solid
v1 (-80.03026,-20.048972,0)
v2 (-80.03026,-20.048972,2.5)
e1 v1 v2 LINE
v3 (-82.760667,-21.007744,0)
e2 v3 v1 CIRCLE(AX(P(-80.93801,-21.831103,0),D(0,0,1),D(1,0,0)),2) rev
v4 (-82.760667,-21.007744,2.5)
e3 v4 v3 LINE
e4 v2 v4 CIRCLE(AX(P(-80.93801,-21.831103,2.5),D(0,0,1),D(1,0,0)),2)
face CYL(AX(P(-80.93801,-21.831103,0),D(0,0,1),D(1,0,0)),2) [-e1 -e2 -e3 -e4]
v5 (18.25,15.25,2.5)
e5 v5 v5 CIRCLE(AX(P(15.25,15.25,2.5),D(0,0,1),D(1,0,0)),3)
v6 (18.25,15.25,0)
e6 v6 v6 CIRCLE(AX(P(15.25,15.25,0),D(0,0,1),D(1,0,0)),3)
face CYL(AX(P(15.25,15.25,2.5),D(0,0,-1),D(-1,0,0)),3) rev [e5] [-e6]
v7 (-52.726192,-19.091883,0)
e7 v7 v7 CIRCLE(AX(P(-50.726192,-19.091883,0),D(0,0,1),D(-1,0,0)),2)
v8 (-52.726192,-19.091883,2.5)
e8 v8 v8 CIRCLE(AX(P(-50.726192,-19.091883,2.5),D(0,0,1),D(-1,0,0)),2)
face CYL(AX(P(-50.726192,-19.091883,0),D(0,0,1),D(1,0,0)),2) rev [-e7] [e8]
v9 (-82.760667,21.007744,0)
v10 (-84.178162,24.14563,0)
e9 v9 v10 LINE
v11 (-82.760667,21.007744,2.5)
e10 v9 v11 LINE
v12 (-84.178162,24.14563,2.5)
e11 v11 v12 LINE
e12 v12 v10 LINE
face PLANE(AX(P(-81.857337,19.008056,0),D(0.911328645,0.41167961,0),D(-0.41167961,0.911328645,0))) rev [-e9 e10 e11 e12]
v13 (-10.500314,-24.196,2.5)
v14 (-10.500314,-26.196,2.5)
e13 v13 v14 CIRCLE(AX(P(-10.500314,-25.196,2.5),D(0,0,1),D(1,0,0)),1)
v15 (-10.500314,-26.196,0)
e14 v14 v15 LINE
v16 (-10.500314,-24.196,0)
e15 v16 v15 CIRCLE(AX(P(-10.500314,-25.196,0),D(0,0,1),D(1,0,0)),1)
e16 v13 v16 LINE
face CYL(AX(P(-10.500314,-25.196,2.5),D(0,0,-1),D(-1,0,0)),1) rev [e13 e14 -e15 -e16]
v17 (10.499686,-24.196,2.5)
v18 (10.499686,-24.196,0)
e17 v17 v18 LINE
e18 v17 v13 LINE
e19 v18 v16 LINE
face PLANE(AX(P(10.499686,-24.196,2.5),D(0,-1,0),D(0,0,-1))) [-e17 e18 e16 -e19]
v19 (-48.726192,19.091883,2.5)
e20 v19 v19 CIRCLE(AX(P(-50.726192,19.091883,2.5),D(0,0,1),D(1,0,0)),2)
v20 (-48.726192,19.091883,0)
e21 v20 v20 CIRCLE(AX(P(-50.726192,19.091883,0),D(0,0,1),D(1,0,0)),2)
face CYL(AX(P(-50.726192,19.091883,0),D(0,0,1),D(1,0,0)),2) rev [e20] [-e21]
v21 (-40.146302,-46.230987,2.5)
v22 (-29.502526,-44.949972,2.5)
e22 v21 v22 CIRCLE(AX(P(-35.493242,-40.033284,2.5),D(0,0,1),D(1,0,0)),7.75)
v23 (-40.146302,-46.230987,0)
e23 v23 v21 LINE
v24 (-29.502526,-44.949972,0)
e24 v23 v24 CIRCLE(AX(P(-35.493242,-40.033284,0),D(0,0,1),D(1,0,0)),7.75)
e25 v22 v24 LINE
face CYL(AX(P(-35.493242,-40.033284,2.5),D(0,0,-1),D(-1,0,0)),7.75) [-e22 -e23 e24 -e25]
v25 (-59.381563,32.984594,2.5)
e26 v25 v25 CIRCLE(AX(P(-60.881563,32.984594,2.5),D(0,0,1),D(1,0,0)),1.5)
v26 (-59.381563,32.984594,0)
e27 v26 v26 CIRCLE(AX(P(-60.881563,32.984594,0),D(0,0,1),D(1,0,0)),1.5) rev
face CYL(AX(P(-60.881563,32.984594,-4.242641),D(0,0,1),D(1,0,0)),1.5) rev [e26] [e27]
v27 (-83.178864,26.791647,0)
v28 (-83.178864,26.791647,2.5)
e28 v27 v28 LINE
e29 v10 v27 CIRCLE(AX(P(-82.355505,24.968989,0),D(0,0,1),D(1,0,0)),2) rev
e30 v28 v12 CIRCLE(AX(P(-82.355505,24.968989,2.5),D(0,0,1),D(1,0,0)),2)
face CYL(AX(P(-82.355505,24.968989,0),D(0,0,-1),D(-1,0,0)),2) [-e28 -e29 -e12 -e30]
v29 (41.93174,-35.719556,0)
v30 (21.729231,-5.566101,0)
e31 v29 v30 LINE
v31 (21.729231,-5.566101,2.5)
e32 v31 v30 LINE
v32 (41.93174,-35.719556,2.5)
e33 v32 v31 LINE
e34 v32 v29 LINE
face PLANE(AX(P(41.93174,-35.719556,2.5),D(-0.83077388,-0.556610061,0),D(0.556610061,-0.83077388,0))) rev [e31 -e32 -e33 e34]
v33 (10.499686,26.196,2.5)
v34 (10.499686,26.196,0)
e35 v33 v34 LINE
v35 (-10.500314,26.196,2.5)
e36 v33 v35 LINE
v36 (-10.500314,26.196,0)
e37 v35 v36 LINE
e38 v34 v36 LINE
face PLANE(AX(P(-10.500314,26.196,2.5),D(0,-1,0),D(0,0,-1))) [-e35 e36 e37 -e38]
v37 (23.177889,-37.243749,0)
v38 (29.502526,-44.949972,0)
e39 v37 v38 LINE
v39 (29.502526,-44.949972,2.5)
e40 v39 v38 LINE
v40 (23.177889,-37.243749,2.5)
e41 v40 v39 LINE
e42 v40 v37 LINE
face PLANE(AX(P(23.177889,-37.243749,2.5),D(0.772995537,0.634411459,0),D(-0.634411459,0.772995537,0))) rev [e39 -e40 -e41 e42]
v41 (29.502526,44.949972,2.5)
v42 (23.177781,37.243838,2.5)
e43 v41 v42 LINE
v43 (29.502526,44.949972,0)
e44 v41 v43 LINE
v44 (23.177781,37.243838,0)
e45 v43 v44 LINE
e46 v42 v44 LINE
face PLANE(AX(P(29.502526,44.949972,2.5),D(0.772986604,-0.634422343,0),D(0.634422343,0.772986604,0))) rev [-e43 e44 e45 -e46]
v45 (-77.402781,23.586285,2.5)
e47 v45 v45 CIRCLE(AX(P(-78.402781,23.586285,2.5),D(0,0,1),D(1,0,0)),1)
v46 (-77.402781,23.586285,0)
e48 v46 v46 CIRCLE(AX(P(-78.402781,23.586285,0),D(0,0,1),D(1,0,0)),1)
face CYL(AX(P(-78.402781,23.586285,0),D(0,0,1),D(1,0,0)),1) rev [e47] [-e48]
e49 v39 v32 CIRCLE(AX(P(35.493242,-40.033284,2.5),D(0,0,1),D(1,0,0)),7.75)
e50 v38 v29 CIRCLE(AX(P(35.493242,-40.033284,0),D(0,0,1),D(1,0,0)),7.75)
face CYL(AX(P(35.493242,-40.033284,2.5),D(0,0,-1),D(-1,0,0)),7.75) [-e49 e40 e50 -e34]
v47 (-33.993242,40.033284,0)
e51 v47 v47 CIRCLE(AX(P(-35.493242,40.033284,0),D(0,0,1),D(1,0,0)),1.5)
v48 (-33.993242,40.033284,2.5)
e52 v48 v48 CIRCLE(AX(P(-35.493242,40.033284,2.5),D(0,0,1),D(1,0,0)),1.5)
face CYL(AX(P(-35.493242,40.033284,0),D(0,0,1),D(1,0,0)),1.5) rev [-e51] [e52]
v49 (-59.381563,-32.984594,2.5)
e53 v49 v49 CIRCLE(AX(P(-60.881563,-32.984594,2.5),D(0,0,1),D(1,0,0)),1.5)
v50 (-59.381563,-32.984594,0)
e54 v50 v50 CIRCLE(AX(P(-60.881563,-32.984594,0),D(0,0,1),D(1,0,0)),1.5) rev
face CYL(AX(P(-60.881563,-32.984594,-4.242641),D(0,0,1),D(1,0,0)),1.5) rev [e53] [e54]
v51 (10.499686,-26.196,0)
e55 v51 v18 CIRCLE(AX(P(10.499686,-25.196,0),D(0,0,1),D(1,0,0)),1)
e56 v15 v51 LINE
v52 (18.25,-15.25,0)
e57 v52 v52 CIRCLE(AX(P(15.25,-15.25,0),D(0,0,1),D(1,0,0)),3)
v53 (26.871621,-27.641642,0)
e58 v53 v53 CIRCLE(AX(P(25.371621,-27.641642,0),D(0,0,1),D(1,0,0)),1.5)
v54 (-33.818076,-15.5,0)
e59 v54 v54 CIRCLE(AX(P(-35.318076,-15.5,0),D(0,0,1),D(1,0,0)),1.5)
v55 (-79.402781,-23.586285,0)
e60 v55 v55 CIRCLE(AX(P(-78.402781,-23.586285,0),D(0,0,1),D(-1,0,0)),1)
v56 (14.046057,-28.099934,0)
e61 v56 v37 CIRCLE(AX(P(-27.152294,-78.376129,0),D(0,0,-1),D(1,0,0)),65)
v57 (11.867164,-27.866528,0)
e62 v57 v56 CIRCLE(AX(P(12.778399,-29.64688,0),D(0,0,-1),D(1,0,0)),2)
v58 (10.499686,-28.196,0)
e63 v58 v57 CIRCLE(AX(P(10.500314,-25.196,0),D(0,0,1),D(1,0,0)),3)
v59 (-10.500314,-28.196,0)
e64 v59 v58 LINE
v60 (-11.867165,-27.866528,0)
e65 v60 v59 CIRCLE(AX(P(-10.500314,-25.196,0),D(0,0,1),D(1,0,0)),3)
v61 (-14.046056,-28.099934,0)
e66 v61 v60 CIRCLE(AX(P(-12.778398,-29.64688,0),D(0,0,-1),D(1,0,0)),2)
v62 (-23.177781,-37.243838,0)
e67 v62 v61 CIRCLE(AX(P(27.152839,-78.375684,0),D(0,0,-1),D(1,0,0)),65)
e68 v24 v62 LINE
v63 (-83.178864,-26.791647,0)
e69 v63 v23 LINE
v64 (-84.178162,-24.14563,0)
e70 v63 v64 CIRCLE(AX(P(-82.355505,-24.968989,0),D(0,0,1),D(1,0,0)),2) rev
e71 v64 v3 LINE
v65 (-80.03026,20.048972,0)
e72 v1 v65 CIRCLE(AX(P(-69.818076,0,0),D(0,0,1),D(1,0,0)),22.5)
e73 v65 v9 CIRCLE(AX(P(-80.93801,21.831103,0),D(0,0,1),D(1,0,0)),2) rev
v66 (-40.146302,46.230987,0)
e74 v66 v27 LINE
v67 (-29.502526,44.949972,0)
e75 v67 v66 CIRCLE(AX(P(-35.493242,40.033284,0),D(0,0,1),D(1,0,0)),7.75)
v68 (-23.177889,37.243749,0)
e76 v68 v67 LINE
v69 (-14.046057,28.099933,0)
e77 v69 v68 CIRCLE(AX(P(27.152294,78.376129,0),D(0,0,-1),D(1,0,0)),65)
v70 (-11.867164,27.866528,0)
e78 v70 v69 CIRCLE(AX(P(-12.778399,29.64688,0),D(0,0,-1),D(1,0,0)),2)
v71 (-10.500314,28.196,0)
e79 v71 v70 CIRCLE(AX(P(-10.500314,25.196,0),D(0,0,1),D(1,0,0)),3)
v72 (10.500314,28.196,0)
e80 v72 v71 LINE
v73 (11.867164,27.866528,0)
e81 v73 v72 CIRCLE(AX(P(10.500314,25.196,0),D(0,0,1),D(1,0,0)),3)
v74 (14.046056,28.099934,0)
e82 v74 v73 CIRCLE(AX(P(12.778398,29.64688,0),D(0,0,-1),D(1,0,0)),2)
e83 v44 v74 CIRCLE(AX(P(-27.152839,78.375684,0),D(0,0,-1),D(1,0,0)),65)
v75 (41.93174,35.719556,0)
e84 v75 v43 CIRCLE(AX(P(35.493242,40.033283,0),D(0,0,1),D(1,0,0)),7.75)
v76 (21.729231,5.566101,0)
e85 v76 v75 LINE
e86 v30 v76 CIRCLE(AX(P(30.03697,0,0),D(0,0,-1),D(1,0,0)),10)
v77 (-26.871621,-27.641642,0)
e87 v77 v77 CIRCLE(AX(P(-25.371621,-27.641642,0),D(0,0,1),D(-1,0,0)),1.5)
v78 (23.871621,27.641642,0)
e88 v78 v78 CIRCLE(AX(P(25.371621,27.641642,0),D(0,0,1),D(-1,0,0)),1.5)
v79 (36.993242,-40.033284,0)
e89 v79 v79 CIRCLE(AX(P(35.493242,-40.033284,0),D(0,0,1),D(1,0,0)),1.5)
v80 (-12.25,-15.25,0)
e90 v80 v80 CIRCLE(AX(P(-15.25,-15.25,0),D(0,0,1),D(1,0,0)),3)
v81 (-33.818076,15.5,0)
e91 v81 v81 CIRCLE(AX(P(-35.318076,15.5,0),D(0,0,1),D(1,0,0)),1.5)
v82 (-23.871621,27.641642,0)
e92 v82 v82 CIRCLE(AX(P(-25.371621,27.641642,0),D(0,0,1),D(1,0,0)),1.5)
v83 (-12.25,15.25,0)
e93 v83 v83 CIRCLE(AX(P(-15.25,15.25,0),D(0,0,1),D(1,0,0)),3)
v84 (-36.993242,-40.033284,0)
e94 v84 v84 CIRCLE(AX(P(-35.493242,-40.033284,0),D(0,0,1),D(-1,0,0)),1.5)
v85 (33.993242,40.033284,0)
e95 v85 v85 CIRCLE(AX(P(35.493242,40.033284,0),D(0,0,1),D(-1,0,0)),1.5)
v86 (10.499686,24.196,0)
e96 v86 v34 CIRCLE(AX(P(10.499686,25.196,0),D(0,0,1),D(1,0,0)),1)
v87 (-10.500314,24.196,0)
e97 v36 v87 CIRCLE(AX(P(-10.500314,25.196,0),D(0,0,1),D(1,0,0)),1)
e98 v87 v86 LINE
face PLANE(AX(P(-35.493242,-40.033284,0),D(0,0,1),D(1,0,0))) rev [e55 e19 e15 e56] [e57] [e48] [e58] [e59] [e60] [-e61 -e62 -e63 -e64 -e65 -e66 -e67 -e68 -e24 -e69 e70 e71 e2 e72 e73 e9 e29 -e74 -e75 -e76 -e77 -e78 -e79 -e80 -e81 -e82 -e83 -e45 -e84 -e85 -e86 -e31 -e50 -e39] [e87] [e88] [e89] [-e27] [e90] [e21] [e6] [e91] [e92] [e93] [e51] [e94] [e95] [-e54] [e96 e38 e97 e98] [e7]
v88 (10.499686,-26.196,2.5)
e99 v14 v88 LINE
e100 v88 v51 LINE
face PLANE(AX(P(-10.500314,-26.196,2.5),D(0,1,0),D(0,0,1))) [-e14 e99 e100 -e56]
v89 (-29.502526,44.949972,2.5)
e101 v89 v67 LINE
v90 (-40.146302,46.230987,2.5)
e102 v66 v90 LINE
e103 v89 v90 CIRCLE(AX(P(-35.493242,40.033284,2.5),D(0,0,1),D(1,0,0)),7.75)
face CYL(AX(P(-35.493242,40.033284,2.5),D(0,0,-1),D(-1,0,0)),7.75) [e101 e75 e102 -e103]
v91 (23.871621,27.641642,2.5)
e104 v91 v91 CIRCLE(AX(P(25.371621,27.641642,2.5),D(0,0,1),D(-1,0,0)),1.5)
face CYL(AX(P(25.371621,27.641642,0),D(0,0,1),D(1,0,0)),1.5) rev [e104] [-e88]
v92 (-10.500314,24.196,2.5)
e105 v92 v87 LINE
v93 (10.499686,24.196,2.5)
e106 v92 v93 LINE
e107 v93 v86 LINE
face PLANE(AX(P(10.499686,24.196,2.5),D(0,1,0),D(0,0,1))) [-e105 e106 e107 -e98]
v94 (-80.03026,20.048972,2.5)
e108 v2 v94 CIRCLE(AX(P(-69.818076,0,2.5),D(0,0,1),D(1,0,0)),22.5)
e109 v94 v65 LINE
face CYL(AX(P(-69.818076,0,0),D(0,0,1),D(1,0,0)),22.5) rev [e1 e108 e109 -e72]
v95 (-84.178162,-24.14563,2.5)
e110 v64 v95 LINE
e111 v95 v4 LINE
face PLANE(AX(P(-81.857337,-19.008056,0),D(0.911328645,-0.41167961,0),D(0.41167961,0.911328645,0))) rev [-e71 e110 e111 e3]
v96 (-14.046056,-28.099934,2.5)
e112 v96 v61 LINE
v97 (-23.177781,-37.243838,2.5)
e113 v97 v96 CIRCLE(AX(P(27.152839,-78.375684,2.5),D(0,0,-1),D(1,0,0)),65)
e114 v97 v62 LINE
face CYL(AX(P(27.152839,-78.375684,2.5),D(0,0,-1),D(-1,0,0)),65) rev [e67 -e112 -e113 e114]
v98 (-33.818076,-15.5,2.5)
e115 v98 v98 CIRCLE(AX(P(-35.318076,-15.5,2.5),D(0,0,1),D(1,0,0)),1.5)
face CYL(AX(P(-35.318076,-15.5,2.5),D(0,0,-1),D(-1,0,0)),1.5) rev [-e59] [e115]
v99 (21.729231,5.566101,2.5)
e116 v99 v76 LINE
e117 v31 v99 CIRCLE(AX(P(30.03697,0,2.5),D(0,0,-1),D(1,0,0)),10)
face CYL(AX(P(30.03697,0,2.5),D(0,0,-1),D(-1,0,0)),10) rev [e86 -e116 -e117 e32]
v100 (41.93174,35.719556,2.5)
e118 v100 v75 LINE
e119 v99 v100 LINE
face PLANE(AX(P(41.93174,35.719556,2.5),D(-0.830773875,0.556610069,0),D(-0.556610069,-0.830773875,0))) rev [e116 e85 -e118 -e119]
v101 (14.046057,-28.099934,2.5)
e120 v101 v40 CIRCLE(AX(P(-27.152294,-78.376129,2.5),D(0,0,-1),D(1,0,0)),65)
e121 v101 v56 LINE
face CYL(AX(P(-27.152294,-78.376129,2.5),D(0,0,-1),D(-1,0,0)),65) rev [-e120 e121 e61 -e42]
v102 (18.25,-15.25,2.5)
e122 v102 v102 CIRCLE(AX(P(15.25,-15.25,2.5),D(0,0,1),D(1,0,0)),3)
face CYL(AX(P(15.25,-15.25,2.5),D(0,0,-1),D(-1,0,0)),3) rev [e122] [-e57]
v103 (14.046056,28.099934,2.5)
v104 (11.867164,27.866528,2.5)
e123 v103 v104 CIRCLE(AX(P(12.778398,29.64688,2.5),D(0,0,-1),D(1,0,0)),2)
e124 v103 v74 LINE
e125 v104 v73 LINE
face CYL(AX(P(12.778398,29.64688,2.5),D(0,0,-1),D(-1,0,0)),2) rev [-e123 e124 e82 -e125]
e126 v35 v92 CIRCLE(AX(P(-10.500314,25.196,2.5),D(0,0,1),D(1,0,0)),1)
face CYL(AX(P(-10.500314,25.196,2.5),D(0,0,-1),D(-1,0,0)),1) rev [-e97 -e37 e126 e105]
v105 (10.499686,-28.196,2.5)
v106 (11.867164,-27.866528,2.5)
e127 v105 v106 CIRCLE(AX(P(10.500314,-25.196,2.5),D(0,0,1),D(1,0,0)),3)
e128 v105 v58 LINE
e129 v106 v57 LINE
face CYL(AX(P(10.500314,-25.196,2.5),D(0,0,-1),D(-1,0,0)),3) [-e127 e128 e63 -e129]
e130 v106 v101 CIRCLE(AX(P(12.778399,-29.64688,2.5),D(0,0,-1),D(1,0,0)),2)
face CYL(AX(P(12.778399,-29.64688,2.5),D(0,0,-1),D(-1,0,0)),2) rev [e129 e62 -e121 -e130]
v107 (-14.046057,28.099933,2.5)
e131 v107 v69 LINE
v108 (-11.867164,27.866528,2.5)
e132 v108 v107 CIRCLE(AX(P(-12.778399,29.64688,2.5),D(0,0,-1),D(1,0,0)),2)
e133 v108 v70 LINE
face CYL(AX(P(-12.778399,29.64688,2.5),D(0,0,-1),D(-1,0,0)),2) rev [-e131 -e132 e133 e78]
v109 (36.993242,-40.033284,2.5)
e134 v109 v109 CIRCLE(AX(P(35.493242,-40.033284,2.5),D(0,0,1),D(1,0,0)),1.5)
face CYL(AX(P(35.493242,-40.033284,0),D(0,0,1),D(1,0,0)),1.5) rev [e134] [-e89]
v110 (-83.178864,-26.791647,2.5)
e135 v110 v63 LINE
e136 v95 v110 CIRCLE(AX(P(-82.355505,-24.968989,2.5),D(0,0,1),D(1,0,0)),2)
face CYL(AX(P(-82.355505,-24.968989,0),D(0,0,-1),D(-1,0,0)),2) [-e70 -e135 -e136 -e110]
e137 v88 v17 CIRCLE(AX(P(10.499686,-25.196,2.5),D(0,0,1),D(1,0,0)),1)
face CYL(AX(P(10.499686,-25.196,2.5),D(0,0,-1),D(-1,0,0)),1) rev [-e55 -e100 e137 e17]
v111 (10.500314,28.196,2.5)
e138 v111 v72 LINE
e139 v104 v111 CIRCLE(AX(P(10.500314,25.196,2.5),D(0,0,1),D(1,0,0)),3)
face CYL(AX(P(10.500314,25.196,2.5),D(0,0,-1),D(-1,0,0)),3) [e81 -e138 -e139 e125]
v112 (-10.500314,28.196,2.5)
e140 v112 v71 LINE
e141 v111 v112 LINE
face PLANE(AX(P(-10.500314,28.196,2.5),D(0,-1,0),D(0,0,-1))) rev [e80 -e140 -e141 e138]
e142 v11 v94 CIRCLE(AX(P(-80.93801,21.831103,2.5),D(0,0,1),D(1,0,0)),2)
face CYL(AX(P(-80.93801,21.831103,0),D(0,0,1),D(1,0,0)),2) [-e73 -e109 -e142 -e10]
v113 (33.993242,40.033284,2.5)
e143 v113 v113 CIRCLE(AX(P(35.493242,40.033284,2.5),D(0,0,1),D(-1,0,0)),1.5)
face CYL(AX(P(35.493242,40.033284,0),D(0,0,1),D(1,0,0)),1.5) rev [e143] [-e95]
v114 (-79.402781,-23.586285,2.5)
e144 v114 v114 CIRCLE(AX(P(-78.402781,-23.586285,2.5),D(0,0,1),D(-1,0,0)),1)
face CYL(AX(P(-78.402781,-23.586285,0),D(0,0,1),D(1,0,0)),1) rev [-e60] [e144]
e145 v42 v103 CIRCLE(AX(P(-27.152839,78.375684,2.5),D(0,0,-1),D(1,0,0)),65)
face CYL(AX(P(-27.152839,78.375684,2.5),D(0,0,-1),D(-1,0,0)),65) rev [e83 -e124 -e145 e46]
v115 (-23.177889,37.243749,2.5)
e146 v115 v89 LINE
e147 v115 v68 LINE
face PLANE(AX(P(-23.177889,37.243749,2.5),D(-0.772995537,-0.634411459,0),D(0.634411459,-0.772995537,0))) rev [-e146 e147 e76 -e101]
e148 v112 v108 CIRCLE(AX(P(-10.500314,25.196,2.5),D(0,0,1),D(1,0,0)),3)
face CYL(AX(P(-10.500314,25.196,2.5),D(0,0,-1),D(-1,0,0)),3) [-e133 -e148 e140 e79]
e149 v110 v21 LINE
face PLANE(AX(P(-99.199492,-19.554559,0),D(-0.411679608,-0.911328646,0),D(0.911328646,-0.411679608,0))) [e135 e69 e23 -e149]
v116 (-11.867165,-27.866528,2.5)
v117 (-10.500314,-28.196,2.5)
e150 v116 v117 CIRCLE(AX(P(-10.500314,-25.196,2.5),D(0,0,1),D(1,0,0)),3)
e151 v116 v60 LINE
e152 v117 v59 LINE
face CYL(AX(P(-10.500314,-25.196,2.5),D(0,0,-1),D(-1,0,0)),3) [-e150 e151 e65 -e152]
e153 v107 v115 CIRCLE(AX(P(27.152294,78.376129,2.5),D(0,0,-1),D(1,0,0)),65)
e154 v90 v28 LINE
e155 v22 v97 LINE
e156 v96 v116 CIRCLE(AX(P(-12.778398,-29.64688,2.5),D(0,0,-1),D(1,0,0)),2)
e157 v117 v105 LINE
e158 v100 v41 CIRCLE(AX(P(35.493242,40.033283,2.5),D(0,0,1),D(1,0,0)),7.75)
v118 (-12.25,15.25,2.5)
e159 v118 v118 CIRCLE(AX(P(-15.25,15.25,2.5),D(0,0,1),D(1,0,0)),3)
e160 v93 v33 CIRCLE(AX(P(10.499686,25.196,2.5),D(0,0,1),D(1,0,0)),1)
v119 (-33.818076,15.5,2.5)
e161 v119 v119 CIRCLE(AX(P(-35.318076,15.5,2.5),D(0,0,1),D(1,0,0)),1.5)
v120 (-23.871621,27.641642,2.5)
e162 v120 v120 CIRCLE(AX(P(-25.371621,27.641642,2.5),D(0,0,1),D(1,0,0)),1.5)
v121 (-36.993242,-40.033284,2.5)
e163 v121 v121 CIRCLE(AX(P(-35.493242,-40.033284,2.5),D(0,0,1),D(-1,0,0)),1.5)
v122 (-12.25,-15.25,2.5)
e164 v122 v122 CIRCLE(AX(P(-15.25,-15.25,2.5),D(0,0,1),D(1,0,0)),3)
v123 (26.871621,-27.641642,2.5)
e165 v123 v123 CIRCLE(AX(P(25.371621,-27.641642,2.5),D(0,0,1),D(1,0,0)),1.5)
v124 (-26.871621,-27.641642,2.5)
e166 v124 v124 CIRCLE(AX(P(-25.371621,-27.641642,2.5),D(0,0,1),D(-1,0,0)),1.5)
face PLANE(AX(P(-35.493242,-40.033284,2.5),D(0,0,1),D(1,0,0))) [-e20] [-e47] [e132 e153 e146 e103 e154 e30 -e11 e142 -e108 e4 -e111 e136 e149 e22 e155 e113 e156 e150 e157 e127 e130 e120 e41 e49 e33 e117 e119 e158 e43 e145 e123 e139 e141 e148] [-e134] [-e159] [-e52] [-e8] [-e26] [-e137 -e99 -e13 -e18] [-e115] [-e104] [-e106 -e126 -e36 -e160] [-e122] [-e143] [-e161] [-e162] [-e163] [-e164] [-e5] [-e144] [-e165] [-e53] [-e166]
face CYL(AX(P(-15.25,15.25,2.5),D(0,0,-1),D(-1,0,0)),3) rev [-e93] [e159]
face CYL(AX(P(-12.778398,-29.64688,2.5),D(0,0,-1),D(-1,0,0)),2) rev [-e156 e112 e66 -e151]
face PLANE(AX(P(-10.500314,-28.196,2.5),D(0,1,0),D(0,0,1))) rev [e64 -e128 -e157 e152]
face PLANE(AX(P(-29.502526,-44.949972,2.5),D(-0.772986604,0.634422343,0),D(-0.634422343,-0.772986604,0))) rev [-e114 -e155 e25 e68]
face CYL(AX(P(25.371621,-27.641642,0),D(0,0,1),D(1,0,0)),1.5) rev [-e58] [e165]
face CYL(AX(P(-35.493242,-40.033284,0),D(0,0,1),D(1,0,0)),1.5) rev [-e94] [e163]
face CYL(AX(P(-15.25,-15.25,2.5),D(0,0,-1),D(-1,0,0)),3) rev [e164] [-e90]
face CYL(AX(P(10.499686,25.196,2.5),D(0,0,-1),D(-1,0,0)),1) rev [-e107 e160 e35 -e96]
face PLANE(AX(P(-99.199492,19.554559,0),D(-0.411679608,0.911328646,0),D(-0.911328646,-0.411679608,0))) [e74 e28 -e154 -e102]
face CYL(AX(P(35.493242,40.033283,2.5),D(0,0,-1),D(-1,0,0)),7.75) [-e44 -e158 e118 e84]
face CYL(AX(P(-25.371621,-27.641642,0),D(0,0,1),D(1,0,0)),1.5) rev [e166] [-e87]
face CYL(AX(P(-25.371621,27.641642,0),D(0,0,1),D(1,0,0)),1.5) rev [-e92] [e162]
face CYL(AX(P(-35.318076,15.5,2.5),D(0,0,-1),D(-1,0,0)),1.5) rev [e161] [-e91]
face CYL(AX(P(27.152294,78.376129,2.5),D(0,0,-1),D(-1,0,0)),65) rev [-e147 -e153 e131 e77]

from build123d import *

# Parameters (mm, degrees)
CROQUIS1_R              = 2.25
CROQUIS1_R_2            = 3
CROQUIS1_R_3            = 1.5
CROQUIS1_R_4            = 2.249997567
SALIENTE_EXTRUIR1_DEPTH = 2.5
SALIENTE_EXTRUIR3_START = -2.5
CROQUIS6_R              = 2.250000066
CROQUIS6_R_2            = 1.5
CROQUIS6_R_3            = 2.25
SALIENTE_EXTRUIR3_DEPTH = 2.5
CROQUIS5_R              = 22.5
CROQUIS5_R_2            = 1
CROQUIS5_R_3            = 2
CORTAR_EXTRUIR5_DEPTH   = 2.5
CORTAR_EXTRUIR6_DEPTH   = 2.5
REDONDEO1_R             = 2
CROQUIS11_R             = 1.5
CROQUIS11_R_2           = 1.500000006
CORTAR_EXTRUIR7_DEPTH   = 2.5


with BuildPart() as part:
    # Croquis1 → Saliente-Extruir1 (new body)
    with BuildSketch(Plane.XY):
        with BuildLine():
            Line((-29.502526327, -44.949972179), (-23.17778065, -37.243838032))
            ThreePointArc((-23.17778065, -37.243838032), (-18.839723212, -32.444384768), (-14.046056443, -28.099933953))
            ThreePointArc((-14.046056443, -28.099933953), (-12.991422185, -27.658257217), (-11.867164621, -27.866527921))
            ThreePointArc((-11.867164621, -27.866527921), (-11.203313373, -28.112469078), (-10.500314, -28.196))
            Line((-10.500314, -28.196), (10.499686, -28.196))
            ThreePointArc((10.499686, -28.196), (11.203007921, -28.112542722), (11.867164264, -27.866528101))
            ThreePointArc((11.867164264, -27.866528101), (12.991422421, -27.658256674), (14.046057406, -28.099933523))
            ThreePointArc((14.046057406, -28.099933523), (18.839775902, -32.444337151), (23.177889012, -37.243749049))
            Line((23.177889012, -37.243749049), (29.502526012, -44.949972049))
            ThreePointArc((29.502526012, -44.949972049), (40.113877497, -46.255199126), (41.931739547, -35.719556022))
            Line((41.931739547, -35.719556022), (21.72923101, -5.566101046))
            ThreePointArc((21.72923101, -5.566101046), (20.036969431, -9.5e-08), (21.729230693, 5.566100954))
            Line((21.729230693, 5.566100954), (41.931739693, 35.719555954))
            ThreePointArc((41.931739693, 35.719555954), (40.113877277, 46.255198335), (29.502526336, 44.949972165))
            Line((29.502526336, 44.949972165), (23.17778065, 37.243838007))
            ThreePointArc((23.17778065, 37.243838007), (18.839723212, 32.444384742), (14.046056443, 28.099933927))
            ThreePointArc((14.046056443, 28.099933927), (12.991421988, 27.658257139), (11.867164252, 27.866528027))
            ThreePointArc((11.867164252, 27.866528027), (11.203313175, 28.112469073), (10.500314, 28.195999974))
            Line((10.500314, 28.195999974), (-10.500314, 28.195999974))
            ThreePointArc((-10.500314, 28.195999974), (-11.203313178, 28.112469098), (-11.867164264, 27.866528075))
            ThreePointArc((-11.867164264, 27.866528075), (-12.991422421, 27.658256648), (-14.046057406, 28.099933497))
            ThreePointArc((-14.046057406, 28.099933497), (-18.839775902, 32.444337126), (-23.177889012, 37.243749023))
            Line((-23.177889012, 37.243749023), (-29.502526012, 44.949972023))
            ThreePointArc((-29.502526012, 44.949972023), (-40.146302424, 46.230987494), (-41.886340556, 35.652554517))
            ThreePointArc((-41.886340556, 35.652554517), (-41.288874902, 25.337679941), (-50.13550001, 20.000000021))
            Line((-50.13550001, 20.000000021), (-97.31807601, 20.000000021))
            ThreePointArc((-97.31807601, 20.000000021), (-99.1994919, 19.554558541), (-100.681450855, 18.312809163))
            add(Edge.make_bspline(
                [(-107.31807554, 2.1e-08), (-107.252414123, 7.059743944), (-104.975710329, 13.164639039), (-100.681450855, 18.312809163)],
                knots=[0, 0, 0, 0, 1, 1, 1, 1], degree=3))
            add(Edge.make_bspline(
                [(-107.31807554, 2.1e-08), (-107.252414123, -7.059743902), (-104.975710329, -13.164638997), (-100.681450855, -18.312809121)],
                knots=[0, 0, 0, 0, 1, 1, 1, 1], degree=3))
            ThreePointArc((-100.681450855, -18.312809121), (-99.19949186, -19.554558345), (-97.31807601, -19.9999997))
            Line((-97.31807601, -19.9999997), (-50.13550001, -19.9999997))
            ThreePointArc((-50.13550001, -19.9999997), (-41.288874902, -25.33767962), (-41.886340556, -35.652554196))
            ThreePointArc((-41.886340556, -35.652554196), (-40.146302646, -46.230987042), (-29.502526327, -44.949972179))
        make_face()
        with Locations((-25.371621, 27.641642)):
            Circle(CROQUIS1_R, mode=Mode.SUBTRACT)
        with Locations((-35.493242035, 40.033284004)):
            Circle(CROQUIS1_R, mode=Mode.SUBTRACT)
        with Locations((-35.49324201, -40.0332837)):
            Circle(CROQUIS1_R, mode=Mode.SUBTRACT)
        with Locations((15.25, -15.25)):
            Circle(CROQUIS1_R_2, mode=Mode.SUBTRACT)
        with Locations((35.493242035, -40.03328403)):
            Circle(CROQUIS1_R, mode=Mode.SUBTRACT)
        with Locations((-15.25, 15.25)):
            Circle(CROQUIS1_R_2, mode=Mode.SUBTRACT)
        with Locations((-25.371621, -27.641642)):
            Circle(CROQUIS1_R, mode=Mode.SUBTRACT)
        with Locations((-35.318076, 15.5)):
            Circle(CROQUIS1_R_3, mode=Mode.SUBTRACT)
        with Locations((25.371621, -27.641642)):
            Circle(CROQUIS1_R, mode=Mode.SUBTRACT)
        with Locations((-15.25, -15.25)):
            Circle(CROQUIS1_R_2, mode=Mode.SUBTRACT)
        with Locations((-97.318076, 15.5)):
            Circle(CROQUIS1_R_3, mode=Mode.SUBTRACT)
        with Locations((15.25, 15.25)):
            Circle(CROQUIS1_R_2, mode=Mode.SUBTRACT)
        with Locations((-35.318076, -15.5)):
            Circle(CROQUIS1_R_3, mode=Mode.SUBTRACT)
        with Locations((25.371621, 27.641642)):
            Circle(CROQUIS1_R, mode=Mode.SUBTRACT)
        with Locations((-97.318076, -15.5)):
            Circle(CROQUIS1_R_3, mode=Mode.SUBTRACT)
        with Locations((35.493241695, 40.03328329)):
            Circle(CROQUIS1_R_4, mode=Mode.SUBTRACT)
        with BuildLine():
            Line((10.499686, -24.196), (-10.500314, -24.196))
            ThreePointArc((-10.500314, -24.196), (-11.500314, -25.196), (-10.500314, -26.196))
            Line((-10.500314, -26.196), (10.499686, -26.196))
            ThreePointArc((10.499686, -26.196), (11.499686, -25.196), (10.499686, -24.196))
        make_face(mode=Mode.SUBTRACT)
        with BuildLine():
            Line((10.499686, 24.196), (-10.500314, 24.196))
            ThreePointArc((-10.500314, 24.196), (-11.500314, 25.196), (-10.500314, 26.196))
            Line((-10.500314, 26.196), (10.499686, 26.196))
            ThreePointArc((10.499686, 26.196), (11.499686, 25.196), (10.499686, 24.196))
        make_face(mode=Mode.SUBTRACT)
    extrude(amount=SALIENTE_EXTRUIR1_DEPTH)


with BuildPart() as saliente_extruir3_tool:
    # Croquis6 → Saliente-Extruir3 (new body)
    # profile 1 of 10: a face of its own
    with BuildSketch(Plane.XY.offset(2.5).offset(SALIENTE_EXTRUIR3_START)):
        with Locations((-35.493242163, 40.033284025)):
            Circle(CROQUIS6_R)
        with Locations((-35.493242163, 40.033284025)):
            Circle(CROQUIS6_R_2, mode=Mode.SUBTRACT)
    # profile 2 of 10: a face of its own
    with BuildSketch(Plane.XY.offset(2.5).offset(SALIENTE_EXTRUIR3_START)):
        with Locations((-25.371621, 27.641642)):
            Circle(CROQUIS6_R_3)
        with Locations((-25.371621, 27.641642)):
            Circle(CROQUIS6_R_2, mode=Mode.SUBTRACT)
    # profile 3 of 10: a face of its own
    with BuildSketch(Plane.XY.offset(2.5).offset(SALIENTE_EXTRUIR3_START)):
        with Locations((25.371621, 27.641642)):
            Circle(CROQUIS6_R_3)
        with Locations(Location((25.371621, 27.641642, 0), (0, 0, 180))):
            Circle(CROQUIS6_R_2, mode=Mode.SUBTRACT)
    # profile 4 of 10: a face of its own
    with BuildSketch(Plane.XY.offset(2.5).offset(SALIENTE_EXTRUIR3_START)):
        with Locations((35.493242163, 40.033284025)):
            Circle(CROQUIS6_R)
        with Locations(Location((35.493242163, 40.033284025, 0), (0, 0, 180))):
            Circle(CROQUIS6_R_2, mode=Mode.SUBTRACT)
    # profile 5 of 10: a face of its own
    with BuildSketch(Plane.XY.offset(2.5).offset(SALIENTE_EXTRUIR3_START)):
        with Locations((35.493242163, -40.033284025)):
            Circle(CROQUIS6_R)
        with Locations((35.493242163, -40.033284025)):
            Circle(CROQUIS6_R_2, mode=Mode.SUBTRACT)
    # profile 6 of 10: a face of its own
    with BuildSketch(Plane.XY.offset(2.5).offset(SALIENTE_EXTRUIR3_START)):
        with Locations((25.371621, -27.641642)):
            Circle(CROQUIS6_R_3)
        with Locations((25.371621, -27.641642)):
            Circle(CROQUIS6_R_2, mode=Mode.SUBTRACT)
    # profile 7 of 10: a face of its own
    with BuildSketch(Plane.XY.offset(2.5).offset(SALIENTE_EXTRUIR3_START)):
        with Locations((-25.371621, -27.641642)):
            Circle(CROQUIS6_R_3)
        with Locations(Location((-25.371621, -27.641642, 0), (0, 0, 180))):
            Circle(CROQUIS6_R_2, mode=Mode.SUBTRACT)
    # profile 8 of 10: a face of its own
    with BuildSketch(Plane.XY.offset(2.5).offset(SALIENTE_EXTRUIR3_START)):
        with Locations((-35.493242163, -40.033284025)):
            Circle(CROQUIS6_R)
        with Locations(Location((-35.493242163, -40.033284025, 0), (0, 0, 180))):
            Circle(CROQUIS6_R_2, mode=Mode.SUBTRACT)
    # profile 9 of 10: a face of its own
    with BuildSketch(Plane.XY.offset(2.5).offset(SALIENTE_EXTRUIR3_START)):
        with BuildLine():
            Line((-99.1994919, 19.554558541), (-40.146302424, 46.230987494))
            ThreePointArc((-40.146302424, 46.230987494), (-43.140478024, 41.291171845), (-41.886340556, 35.652554517))
            ThreePointArc((-41.886340556, 35.652554517), (-41.288875033, 25.33768001), (-50.13550001, 20.000000021))
            Line((-50.13550001, 20.000000021), (-97.31807601, 20.000000021))
            ThreePointArc((-97.31807601, 20.000000021), (-98.214581153, 19.590579436), (-99.1994919, 19.554558541))
        make_face()
    # profile 10 of 10: a face of its own
    with BuildSketch(Plane.XY.offset(2.5).offset(SALIENTE_EXTRUIR3_START)):
        with BuildLine():
            Line((-50.13550001, -20.000000021), (-97.31807601, -20.000000021))
            ThreePointArc((-97.31807601, -20.000000021), (-98.214581153, -19.590579436), (-99.1994919, -19.554558541))
            Line((-99.1994919, -19.554558541), (-40.146302424, -46.230987494))
            ThreePointArc((-40.146302424, -46.230987494), (-43.140478024, -41.291171845), (-41.886340556, -35.652554517))
            ThreePointArc((-41.886340556, -35.652554517), (-41.288875033, -25.33768001), (-50.13550001, -20.000000021))
        make_face()
    extrude(amount=SALIENTE_EXTRUIR3_DEPTH)


with BuildPart() as part_1:
    add(part.part)


with BuildPart() as part_2:
    # Saliente-Extruir3: joined with saliente_extruir3_tool
    add(part_1.part.fuse(saliente_extruir3_tool.part, tol=0.00001))

    # Croquis5 → Cortar-Extruir5 (cut)
    with BuildSketch(Plane.XY.offset(2.5)):
        with Locations((-69.81807554, 2.1e-08)):
            Circle(CROQUIS5_R)
        with Locations((-78.402781137, 23.586284803)):
            Circle(CROQUIS5_R_2)
        with Locations((-94.91807554, 2.1e-08)):
            Circle(CROQUIS5_R_2)
        with Locations(Location((-78.402781137, -23.586284761, 0), (0, 0, 180))):
            Circle(CROQUIS5_R_2)
        with Locations((-50.726192448, 19.091883113)):
            Circle(CROQUIS5_R_3)
        with Locations(Location((-50.726192448, -19.091883071, 0), (0, 0, 180))):
            Circle(CROQUIS5_R_3)
    extrude(amount=-CORTAR_EXTRUIR5_DEPTH, mode=Mode.SUBTRACT)

    # Croquis10 → Cortar-Extruir6 (cut)
    with BuildSketch(Plane.XY.offset(2.5)):
        with BuildLine():
            Line((-81.857336743, 19.008055936), (-85.001521285, 25.96828755))
            ThreePointArc((-85.001521285, 25.96828755), (-102.968648752, 18.835514529), (-107.31807554, 2.1e-08))
            ThreePointArc((-107.31807554, 2.1e-08), (-102.968648773, -18.835514521), (-85.001521285, -25.96828755))
            Line((-85.001521285, -25.96828755), (-81.857336743, -19.008055936))
            ThreePointArc((-81.857336743, -19.008055936), (-92.318075557, 0), (-81.857336743, 19.008055936))
        make_face()
    extrude(amount=-CORTAR_EXTRUIR6_DEPTH, mode=Mode.SUBTRACT)

    # Redondeo1
    redondeo1_edges = [part_2.edges().sort_by_distance(p)[0] for p in [
        (-81.857336743, -19.008055936, 1.25),
        (-85.001521285, -25.96828755, 1.25),
        (-85.001521285, 25.96828755, 1.25),
        (-81.857336743, 19.008055936, 1.25),
    ]]
    fillet(redondeo1_edges, radius=REDONDEO1_R)

    # Croquis11 → Cortar-Extruir7 (cut)
    with BuildSketch(Plane.XY.offset(2.5)):
        with Locations((-60.881562628, 32.984594162)):
            Circle(CROQUIS11_R)
        with Locations((-60.881562628, -32.984594162)):
            Circle(CROQUIS11_R_2)
    extrude(amount=-CORTAR_EXTRUIR7_DEPTH, mode=Mode.SUBTRACT)


solid = part_2.part
